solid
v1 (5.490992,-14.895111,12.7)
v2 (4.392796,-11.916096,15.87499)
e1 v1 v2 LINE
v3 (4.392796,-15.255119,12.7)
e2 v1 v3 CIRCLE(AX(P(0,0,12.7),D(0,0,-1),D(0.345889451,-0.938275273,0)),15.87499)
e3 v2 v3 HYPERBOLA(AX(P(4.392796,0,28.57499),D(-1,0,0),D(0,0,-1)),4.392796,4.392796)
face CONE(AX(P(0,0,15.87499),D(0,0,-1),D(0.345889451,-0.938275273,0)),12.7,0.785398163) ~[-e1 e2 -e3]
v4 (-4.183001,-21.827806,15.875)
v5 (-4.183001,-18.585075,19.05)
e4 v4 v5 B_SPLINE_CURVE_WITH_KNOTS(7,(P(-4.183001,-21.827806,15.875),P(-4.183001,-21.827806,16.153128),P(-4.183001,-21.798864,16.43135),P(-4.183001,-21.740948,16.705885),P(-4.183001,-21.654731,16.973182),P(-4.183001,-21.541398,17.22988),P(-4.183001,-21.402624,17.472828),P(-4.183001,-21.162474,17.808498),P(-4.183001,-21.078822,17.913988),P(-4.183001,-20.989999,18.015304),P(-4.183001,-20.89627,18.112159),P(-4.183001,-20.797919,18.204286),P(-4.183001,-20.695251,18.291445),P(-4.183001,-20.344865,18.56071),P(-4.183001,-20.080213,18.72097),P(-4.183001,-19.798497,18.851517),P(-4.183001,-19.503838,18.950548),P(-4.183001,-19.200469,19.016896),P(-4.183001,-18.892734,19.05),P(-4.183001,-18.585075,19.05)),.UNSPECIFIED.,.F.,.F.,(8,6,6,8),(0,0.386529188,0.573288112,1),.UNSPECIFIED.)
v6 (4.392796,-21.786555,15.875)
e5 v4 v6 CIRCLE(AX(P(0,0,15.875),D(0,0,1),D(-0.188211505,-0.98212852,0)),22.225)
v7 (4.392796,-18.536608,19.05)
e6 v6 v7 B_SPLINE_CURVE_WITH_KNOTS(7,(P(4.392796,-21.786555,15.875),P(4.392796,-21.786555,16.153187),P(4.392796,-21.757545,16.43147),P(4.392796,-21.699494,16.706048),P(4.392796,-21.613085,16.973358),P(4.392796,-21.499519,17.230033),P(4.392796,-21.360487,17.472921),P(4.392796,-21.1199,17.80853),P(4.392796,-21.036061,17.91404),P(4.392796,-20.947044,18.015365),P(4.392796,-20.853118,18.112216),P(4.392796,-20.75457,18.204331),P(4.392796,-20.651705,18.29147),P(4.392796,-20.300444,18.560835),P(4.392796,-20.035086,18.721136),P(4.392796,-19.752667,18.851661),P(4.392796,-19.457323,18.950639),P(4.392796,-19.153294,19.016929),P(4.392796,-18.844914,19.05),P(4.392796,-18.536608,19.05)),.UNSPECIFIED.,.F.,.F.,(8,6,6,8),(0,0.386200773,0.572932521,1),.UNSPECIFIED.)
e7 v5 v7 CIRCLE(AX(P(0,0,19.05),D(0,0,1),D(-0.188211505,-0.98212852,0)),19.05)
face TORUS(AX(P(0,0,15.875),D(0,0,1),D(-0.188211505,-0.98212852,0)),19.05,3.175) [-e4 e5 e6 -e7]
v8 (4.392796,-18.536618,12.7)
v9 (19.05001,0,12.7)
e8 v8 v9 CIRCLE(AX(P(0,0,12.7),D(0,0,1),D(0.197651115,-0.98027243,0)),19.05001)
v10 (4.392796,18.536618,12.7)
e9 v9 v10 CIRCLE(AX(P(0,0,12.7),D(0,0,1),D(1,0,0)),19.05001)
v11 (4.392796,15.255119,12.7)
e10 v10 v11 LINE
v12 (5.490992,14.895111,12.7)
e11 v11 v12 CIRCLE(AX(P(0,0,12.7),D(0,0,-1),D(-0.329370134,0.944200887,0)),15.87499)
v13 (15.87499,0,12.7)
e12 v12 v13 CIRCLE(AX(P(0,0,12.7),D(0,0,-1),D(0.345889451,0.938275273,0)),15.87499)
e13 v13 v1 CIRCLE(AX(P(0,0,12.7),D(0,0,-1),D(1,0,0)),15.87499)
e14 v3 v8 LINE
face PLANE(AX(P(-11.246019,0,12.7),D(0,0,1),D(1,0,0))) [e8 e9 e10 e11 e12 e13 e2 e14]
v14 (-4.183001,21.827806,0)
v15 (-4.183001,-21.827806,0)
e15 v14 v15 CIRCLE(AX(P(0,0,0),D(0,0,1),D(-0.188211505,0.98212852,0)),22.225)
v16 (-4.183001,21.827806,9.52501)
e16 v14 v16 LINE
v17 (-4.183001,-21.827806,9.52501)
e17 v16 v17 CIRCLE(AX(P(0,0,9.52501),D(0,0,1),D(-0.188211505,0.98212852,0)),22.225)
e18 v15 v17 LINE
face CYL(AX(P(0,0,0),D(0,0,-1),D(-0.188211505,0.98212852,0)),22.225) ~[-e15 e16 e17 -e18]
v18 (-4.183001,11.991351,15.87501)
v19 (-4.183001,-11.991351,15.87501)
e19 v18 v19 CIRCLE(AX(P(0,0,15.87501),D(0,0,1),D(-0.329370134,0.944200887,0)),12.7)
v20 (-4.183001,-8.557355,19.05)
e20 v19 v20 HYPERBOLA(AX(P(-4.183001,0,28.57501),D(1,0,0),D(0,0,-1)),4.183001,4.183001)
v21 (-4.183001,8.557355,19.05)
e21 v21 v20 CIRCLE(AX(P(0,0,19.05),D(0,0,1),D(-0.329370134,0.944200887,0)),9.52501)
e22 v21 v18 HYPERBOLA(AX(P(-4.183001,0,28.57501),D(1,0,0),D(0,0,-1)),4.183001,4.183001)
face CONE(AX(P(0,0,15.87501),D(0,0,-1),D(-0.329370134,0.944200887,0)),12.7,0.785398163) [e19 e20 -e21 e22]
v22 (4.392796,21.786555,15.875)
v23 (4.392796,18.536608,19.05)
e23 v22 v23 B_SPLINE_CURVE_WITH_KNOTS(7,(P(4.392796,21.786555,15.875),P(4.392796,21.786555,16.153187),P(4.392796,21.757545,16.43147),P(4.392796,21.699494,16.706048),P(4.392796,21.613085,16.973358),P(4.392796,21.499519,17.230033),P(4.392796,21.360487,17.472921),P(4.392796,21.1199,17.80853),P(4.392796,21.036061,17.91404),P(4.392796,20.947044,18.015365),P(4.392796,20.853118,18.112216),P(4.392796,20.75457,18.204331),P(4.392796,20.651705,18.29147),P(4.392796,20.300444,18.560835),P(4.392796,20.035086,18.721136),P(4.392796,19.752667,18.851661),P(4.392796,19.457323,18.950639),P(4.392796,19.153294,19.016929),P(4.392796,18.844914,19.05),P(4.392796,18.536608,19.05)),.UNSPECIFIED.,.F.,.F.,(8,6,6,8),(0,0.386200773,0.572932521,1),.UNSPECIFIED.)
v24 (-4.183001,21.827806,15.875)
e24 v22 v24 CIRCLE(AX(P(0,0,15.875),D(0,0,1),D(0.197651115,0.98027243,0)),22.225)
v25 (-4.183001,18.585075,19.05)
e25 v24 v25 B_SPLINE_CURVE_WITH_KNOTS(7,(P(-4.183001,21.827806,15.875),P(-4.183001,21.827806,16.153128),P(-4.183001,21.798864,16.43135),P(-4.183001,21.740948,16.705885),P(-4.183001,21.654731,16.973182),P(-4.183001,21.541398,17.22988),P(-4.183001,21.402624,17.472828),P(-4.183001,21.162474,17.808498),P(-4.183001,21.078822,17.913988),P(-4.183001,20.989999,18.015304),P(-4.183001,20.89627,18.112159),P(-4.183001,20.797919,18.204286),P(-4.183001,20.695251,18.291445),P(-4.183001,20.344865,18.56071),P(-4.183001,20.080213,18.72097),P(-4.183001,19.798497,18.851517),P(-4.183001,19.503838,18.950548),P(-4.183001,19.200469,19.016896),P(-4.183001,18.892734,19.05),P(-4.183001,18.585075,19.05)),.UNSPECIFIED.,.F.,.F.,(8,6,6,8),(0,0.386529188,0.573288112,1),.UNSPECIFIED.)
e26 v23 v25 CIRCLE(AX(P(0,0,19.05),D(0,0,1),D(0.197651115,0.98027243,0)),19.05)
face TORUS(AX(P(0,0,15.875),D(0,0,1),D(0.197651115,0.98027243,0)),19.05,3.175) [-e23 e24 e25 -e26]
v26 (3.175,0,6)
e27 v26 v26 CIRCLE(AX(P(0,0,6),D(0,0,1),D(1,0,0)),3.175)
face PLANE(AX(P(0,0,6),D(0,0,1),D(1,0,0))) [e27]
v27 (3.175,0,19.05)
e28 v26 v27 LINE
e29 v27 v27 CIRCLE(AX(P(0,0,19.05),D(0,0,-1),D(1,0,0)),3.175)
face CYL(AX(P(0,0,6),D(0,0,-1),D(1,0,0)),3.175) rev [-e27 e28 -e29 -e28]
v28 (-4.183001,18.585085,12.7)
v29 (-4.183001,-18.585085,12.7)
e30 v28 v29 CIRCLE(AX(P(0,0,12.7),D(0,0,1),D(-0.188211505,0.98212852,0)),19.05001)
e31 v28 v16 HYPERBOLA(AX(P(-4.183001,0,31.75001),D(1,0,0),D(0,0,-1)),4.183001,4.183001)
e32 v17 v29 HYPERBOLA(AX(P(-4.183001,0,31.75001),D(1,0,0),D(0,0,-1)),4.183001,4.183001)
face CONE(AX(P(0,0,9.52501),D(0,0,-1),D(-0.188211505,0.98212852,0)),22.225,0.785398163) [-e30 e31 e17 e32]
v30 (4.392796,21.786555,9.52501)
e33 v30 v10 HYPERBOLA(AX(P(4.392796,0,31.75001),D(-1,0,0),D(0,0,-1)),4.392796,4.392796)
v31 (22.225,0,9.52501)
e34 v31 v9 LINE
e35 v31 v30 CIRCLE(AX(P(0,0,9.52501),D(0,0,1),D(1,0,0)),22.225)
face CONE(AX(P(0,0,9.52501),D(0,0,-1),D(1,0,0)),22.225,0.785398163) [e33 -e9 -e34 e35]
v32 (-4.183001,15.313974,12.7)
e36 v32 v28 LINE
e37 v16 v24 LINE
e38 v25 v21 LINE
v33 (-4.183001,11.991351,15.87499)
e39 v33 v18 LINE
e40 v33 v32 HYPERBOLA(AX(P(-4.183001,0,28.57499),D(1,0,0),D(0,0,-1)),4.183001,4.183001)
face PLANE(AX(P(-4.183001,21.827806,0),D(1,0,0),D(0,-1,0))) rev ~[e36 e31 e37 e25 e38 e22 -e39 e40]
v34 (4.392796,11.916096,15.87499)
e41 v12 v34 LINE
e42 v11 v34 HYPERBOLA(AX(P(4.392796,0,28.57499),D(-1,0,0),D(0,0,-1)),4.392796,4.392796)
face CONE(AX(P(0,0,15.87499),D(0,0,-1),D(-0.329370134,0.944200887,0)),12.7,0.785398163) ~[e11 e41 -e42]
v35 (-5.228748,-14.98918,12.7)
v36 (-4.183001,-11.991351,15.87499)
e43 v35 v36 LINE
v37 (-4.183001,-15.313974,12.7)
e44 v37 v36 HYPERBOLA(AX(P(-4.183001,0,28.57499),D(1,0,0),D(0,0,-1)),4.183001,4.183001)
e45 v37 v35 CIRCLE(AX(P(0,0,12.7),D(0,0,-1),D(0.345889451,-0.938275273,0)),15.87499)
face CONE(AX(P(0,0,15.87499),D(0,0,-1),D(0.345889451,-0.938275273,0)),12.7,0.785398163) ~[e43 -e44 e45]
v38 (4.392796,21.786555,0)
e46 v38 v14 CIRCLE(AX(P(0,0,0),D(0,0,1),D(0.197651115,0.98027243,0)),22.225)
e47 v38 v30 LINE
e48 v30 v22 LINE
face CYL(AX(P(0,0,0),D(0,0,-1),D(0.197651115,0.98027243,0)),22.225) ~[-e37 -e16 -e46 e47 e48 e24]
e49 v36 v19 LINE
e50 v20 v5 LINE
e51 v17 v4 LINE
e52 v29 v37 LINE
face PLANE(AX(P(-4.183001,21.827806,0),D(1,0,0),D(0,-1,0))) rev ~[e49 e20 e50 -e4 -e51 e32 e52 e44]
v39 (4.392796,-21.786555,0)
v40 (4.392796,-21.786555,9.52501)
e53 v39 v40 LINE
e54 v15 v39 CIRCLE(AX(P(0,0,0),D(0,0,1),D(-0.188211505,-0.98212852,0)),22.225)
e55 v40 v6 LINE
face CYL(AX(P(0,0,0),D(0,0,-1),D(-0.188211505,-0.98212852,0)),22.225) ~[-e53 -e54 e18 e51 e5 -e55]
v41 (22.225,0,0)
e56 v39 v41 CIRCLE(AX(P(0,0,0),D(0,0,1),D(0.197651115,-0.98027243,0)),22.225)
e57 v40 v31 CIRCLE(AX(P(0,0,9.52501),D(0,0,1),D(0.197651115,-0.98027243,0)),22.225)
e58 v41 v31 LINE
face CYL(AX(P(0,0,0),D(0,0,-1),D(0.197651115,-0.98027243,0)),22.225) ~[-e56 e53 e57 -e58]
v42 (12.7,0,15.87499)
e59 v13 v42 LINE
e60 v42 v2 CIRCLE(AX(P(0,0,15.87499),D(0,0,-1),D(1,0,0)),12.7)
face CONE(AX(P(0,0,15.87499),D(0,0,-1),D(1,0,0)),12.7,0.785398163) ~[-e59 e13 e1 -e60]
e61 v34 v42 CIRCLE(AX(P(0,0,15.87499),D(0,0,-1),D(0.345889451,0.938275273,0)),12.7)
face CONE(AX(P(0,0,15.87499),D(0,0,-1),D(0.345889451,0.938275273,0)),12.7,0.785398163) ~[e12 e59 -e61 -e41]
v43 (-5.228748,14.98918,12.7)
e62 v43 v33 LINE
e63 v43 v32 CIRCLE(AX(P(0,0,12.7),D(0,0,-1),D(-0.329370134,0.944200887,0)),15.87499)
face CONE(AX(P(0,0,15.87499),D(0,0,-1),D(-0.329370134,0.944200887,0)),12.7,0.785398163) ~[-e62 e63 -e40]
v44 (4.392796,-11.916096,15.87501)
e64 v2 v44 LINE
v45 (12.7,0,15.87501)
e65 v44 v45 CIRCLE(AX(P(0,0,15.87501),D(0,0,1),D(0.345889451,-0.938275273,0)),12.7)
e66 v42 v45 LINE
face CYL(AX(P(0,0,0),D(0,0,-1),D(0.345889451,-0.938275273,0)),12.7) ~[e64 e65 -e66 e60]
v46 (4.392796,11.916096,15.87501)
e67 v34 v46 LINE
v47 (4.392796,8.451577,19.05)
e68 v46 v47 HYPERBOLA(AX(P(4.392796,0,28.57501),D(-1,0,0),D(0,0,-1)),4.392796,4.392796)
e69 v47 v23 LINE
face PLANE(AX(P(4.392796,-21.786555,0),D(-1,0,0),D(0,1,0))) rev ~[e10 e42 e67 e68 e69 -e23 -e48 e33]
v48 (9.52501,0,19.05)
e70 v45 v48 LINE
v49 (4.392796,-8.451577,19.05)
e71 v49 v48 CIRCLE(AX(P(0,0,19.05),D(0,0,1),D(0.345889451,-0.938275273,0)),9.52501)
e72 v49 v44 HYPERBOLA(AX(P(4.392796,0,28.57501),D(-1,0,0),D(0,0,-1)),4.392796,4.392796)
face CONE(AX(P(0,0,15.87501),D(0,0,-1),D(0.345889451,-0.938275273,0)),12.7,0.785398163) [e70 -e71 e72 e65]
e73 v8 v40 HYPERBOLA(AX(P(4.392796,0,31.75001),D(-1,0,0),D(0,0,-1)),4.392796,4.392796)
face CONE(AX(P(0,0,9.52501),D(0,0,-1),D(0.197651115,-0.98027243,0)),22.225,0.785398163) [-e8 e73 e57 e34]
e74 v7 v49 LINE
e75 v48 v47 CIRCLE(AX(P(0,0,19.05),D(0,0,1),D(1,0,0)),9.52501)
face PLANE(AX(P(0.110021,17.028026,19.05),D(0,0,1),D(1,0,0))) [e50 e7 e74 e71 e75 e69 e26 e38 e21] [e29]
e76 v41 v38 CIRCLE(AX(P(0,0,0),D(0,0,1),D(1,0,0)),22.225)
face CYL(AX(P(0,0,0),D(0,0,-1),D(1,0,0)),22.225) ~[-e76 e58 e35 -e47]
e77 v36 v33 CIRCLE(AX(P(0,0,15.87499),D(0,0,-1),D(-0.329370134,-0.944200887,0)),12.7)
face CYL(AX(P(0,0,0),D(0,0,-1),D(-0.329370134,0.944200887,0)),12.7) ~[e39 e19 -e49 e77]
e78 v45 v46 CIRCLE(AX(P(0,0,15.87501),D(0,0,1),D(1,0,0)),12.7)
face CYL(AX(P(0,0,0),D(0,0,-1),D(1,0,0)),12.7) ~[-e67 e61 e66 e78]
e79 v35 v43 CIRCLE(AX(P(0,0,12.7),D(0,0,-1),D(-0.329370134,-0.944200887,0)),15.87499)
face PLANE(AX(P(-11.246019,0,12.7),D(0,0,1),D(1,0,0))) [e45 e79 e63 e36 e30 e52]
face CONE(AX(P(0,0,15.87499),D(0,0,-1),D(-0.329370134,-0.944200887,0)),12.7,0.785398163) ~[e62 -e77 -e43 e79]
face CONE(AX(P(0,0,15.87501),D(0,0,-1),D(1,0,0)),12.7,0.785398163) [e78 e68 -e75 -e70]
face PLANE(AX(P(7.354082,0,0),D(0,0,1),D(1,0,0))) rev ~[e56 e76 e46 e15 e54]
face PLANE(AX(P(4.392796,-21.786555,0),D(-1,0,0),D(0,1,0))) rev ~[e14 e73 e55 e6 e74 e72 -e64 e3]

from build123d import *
from build123d import SkipClean  # not in build123d's __all__

# Parameters (mm, degrees)
F0_R     = 3.175
F1_DEPTH = 12.7
F2_DEPTH = 19.05
F3_SIZE  = 3.17499
F4_DEPTH = 19.05
F5_R     = 3.175
F6_START = 6
F6_DEPTH = 15


# Not quite as in the source:
# - a fillet or chamfer is up to 0.001 mm smaller than in the source, because OpenCascade refuses the exact size


with BuildPart() as f1:
    # F0 (on Top) → F1 (new body)
    with BuildSketch(Plane.XY):
        with BuildLine():
            Line((-4.1830006975, 11.9913512652), (-4.1830006975, 21.8278063526))
            ThreePointArc((-4.1830006975, 21.8278063526), (-22.225, 0), (-4.1830006975, -21.8278063526))
            Line((-4.1830006975, -21.8278063526), (-4.1830006975, -11.9913512652))
            ThreePointArc((-4.1830006975, -11.9913512652), (-12.7, 0), (-4.1830006975, 11.9913512652))
        make_face()
        with BuildLine():
            ThreePointArc((4.3927960263, -21.7865547545), (17.1985539608, -14.0769445072), (22.225, 0))
            ThreePointArc((22.225, 0), (17.1985539608, 14.0769445072), (4.3927960263, 21.7865547545))
            Line((4.3927960263, 21.7865547545), (4.3927960263, 11.916095966))
            ThreePointArc((4.3927960263, 11.916095966), (10.4182174467, 7.2629708269), (12.7, 0))
            ThreePointArc((12.7, 0), (10.4182174467, -7.2629708269), (4.3927960263, -11.916095966))
            Line((4.3927960263, -11.916095966), (4.3927960263, -21.7865547545))
        make_face()
        with BuildLine():
            Line((4.3927960263, -11.916095966), (4.3927960263, 11.916095966))
            ThreePointArc((4.3927960263, 11.916095966), (0.1114421824, 12.6995110394), (-4.1830006975, 11.9913512652))
            Line((-4.1830006975, 11.9913512652), (-4.1830006975, -11.9913512652))
            ThreePointArc((-4.1830006975, -11.9913512652), (0.1114421824, -12.6995110394), (4.3927960263, -11.916095966))
        make_face()
        Circle(F0_R, mode=Mode.SUBTRACT)
        with BuildLine():
            Line((-4.1830006975, -11.9913512652), (-4.1830006975, 11.9913512652))
            ThreePointArc((-4.1830006975, 11.9913512652), (-12.7, 0), (-4.1830006975, -11.9913512652))
        make_face()
        with BuildLine():
            ThreePointArc((12.7, 0), (10.4182174467, 7.2629708269), (4.3927960263, 11.916095966))
            Line((4.3927960263, 11.916095966), (4.3927960263, -11.916095966))
            ThreePointArc((4.3927960263, -11.916095966), (10.4182174467, -7.2629708269), (12.7, 0))
        make_face()
        with BuildLine():
            Line((4.3927960263, 11.916095966), (4.3927960263, 21.7865547545))
            ThreePointArc((4.3927960263, 21.7865547545), (0.1069062374, 22.2247428794), (-4.1830006975, 21.8278063526))
            Line((-4.1830006975, 21.8278063526), (-4.1830006975, 11.9913512652))
            ThreePointArc((-4.1830006975, 11.9913512652), (0.1114421824, 12.6995110394), (4.3927960263, 11.916095966))
        make_face()
        with BuildLine():
            ThreePointArc((-4.1830006975, -21.8278063526), (0.1069062374, -22.2247428794), (4.3927960263, -21.7865547545))
            Line((4.3927960263, -21.7865547545), (4.3927960263, -11.916095966))
            ThreePointArc((4.3927960263, -11.916095966), (0.1114421824, -12.6995110394), (-4.1830006975, -11.9913512652))
            Line((-4.1830006975, -11.9913512652), (-4.1830006975, -21.8278063526))
        make_face()
        Circle(F0_R)
    extrude(amount=F1_DEPTH)

    # F0 (on Top) → F2 (join)
    with BuildSketch(Plane.XY):
        with BuildLine():
            ThreePointArc((12.7, 0), (10.4182174467, 7.2629708269), (4.3927960263, 11.916095966))
            Line((4.3927960263, 11.916095966), (4.3927960263, -11.916095966))
            ThreePointArc((4.3927960263, -11.916095966), (10.4182174467, -7.2629708269), (12.7, 0))
        make_face()
        with BuildLine():
            Line((-4.1830006975, -11.9913512652), (-4.1830006975, 11.9913512652))
            ThreePointArc((-4.1830006975, 11.9913512652), (-12.7, 0), (-4.1830006975, -11.9913512652))
        make_face()
        with BuildLine():
            Line((4.3927960263, -11.916095966), (4.3927960263, 11.916095966))
            ThreePointArc((4.3927960263, 11.916095966), (0.1114421824, 12.6995110394), (-4.1830006975, 11.9913512652))
            Line((-4.1830006975, 11.9913512652), (-4.1830006975, -11.9913512652))
            ThreePointArc((-4.1830006975, -11.9913512652), (0.1114421824, -12.6995110394), (4.3927960263, -11.916095966))
        make_face()
        Circle(F0_R, mode=Mode.SUBTRACT)
        Circle(F0_R)
    extrude(amount=F2_DEPTH)

    # F3 (size 3.175 in the source; OpenCascade refuses exactly that, so slightly less here)
    f3_edges = [f1.edges().sort_by_distance(p)[0] for p in [
        (4.183001, -21.827806, 12.7),
        (-4.392796, -11.916096, 12.7),
        (-4.392796, -11.916096, 19.05),
    ]]
    chamfer(f3_edges, length=F3_SIZE)

    # F0 (on Top) → F4 (join)
    with BuildSketch(Plane.XY):
        with BuildLine():
            Line((4.3927960263, 11.916095966), (4.3927960263, 21.7865547545))
            ThreePointArc((4.3927960263, 21.7865547545), (0.1069062374, 22.2247428794), (-4.1830006975, 21.8278063526))
            Line((-4.1830006975, 21.8278063526), (-4.1830006975, 11.9913512652))
            ThreePointArc((-4.1830006975, 11.9913512652), (0.1114421824, 12.6995110394), (4.3927960263, 11.916095966))
        make_face()
        with BuildLine():
            Line((4.3927960263, -11.916095966), (4.3927960263, 11.916095966))
            ThreePointArc((4.3927960263, 11.916095966), (0.1114421824, 12.6995110394), (-4.1830006975, 11.9913512652))
            Line((-4.1830006975, 11.9913512652), (-4.1830006975, -11.9913512652))
            ThreePointArc((-4.1830006975, -11.9913512652), (0.1114421824, -12.6995110394), (4.3927960263, -11.916095966))
        make_face()
        Circle(F0_R, mode=Mode.SUBTRACT)
        with BuildLine():
            ThreePointArc((-4.1830006975, -21.8278063526), (0.1069062374, -22.2247428794), (4.3927960263, -21.7865547545))
            Line((4.3927960263, -21.7865547545), (4.3927960263, -11.916095966))
            ThreePointArc((4.3927960263, -11.916095966), (0.1114421824, -12.6995110394), (-4.1830006975, -11.9913512652))
            Line((-4.1830006975, -11.9913512652), (-4.1830006975, -21.8278063526))
        make_face()
    with SkipClean():  # cleaning this boolean's faces spoils the solid; the shape is the same uncleaned
        extrude(amount=F4_DEPTH)

    # F5
    f5_edges = [f1.edges().sort_by_distance(p)[0] for p in [
        (0.106906, -22.224743, 19.05),
        (0.106906, 22.224743, 19.05),
    ]]
    fillet(f5_edges, radius=F5_R)

    # F0 (on Top) → F6 (cut)
    with BuildSketch(Plane.XY.offset(F6_START)):
        Circle(F0_R)
    extrude(amount=F6_DEPTH, mode=Mode.SUBTRACT)


solid = f1.part
